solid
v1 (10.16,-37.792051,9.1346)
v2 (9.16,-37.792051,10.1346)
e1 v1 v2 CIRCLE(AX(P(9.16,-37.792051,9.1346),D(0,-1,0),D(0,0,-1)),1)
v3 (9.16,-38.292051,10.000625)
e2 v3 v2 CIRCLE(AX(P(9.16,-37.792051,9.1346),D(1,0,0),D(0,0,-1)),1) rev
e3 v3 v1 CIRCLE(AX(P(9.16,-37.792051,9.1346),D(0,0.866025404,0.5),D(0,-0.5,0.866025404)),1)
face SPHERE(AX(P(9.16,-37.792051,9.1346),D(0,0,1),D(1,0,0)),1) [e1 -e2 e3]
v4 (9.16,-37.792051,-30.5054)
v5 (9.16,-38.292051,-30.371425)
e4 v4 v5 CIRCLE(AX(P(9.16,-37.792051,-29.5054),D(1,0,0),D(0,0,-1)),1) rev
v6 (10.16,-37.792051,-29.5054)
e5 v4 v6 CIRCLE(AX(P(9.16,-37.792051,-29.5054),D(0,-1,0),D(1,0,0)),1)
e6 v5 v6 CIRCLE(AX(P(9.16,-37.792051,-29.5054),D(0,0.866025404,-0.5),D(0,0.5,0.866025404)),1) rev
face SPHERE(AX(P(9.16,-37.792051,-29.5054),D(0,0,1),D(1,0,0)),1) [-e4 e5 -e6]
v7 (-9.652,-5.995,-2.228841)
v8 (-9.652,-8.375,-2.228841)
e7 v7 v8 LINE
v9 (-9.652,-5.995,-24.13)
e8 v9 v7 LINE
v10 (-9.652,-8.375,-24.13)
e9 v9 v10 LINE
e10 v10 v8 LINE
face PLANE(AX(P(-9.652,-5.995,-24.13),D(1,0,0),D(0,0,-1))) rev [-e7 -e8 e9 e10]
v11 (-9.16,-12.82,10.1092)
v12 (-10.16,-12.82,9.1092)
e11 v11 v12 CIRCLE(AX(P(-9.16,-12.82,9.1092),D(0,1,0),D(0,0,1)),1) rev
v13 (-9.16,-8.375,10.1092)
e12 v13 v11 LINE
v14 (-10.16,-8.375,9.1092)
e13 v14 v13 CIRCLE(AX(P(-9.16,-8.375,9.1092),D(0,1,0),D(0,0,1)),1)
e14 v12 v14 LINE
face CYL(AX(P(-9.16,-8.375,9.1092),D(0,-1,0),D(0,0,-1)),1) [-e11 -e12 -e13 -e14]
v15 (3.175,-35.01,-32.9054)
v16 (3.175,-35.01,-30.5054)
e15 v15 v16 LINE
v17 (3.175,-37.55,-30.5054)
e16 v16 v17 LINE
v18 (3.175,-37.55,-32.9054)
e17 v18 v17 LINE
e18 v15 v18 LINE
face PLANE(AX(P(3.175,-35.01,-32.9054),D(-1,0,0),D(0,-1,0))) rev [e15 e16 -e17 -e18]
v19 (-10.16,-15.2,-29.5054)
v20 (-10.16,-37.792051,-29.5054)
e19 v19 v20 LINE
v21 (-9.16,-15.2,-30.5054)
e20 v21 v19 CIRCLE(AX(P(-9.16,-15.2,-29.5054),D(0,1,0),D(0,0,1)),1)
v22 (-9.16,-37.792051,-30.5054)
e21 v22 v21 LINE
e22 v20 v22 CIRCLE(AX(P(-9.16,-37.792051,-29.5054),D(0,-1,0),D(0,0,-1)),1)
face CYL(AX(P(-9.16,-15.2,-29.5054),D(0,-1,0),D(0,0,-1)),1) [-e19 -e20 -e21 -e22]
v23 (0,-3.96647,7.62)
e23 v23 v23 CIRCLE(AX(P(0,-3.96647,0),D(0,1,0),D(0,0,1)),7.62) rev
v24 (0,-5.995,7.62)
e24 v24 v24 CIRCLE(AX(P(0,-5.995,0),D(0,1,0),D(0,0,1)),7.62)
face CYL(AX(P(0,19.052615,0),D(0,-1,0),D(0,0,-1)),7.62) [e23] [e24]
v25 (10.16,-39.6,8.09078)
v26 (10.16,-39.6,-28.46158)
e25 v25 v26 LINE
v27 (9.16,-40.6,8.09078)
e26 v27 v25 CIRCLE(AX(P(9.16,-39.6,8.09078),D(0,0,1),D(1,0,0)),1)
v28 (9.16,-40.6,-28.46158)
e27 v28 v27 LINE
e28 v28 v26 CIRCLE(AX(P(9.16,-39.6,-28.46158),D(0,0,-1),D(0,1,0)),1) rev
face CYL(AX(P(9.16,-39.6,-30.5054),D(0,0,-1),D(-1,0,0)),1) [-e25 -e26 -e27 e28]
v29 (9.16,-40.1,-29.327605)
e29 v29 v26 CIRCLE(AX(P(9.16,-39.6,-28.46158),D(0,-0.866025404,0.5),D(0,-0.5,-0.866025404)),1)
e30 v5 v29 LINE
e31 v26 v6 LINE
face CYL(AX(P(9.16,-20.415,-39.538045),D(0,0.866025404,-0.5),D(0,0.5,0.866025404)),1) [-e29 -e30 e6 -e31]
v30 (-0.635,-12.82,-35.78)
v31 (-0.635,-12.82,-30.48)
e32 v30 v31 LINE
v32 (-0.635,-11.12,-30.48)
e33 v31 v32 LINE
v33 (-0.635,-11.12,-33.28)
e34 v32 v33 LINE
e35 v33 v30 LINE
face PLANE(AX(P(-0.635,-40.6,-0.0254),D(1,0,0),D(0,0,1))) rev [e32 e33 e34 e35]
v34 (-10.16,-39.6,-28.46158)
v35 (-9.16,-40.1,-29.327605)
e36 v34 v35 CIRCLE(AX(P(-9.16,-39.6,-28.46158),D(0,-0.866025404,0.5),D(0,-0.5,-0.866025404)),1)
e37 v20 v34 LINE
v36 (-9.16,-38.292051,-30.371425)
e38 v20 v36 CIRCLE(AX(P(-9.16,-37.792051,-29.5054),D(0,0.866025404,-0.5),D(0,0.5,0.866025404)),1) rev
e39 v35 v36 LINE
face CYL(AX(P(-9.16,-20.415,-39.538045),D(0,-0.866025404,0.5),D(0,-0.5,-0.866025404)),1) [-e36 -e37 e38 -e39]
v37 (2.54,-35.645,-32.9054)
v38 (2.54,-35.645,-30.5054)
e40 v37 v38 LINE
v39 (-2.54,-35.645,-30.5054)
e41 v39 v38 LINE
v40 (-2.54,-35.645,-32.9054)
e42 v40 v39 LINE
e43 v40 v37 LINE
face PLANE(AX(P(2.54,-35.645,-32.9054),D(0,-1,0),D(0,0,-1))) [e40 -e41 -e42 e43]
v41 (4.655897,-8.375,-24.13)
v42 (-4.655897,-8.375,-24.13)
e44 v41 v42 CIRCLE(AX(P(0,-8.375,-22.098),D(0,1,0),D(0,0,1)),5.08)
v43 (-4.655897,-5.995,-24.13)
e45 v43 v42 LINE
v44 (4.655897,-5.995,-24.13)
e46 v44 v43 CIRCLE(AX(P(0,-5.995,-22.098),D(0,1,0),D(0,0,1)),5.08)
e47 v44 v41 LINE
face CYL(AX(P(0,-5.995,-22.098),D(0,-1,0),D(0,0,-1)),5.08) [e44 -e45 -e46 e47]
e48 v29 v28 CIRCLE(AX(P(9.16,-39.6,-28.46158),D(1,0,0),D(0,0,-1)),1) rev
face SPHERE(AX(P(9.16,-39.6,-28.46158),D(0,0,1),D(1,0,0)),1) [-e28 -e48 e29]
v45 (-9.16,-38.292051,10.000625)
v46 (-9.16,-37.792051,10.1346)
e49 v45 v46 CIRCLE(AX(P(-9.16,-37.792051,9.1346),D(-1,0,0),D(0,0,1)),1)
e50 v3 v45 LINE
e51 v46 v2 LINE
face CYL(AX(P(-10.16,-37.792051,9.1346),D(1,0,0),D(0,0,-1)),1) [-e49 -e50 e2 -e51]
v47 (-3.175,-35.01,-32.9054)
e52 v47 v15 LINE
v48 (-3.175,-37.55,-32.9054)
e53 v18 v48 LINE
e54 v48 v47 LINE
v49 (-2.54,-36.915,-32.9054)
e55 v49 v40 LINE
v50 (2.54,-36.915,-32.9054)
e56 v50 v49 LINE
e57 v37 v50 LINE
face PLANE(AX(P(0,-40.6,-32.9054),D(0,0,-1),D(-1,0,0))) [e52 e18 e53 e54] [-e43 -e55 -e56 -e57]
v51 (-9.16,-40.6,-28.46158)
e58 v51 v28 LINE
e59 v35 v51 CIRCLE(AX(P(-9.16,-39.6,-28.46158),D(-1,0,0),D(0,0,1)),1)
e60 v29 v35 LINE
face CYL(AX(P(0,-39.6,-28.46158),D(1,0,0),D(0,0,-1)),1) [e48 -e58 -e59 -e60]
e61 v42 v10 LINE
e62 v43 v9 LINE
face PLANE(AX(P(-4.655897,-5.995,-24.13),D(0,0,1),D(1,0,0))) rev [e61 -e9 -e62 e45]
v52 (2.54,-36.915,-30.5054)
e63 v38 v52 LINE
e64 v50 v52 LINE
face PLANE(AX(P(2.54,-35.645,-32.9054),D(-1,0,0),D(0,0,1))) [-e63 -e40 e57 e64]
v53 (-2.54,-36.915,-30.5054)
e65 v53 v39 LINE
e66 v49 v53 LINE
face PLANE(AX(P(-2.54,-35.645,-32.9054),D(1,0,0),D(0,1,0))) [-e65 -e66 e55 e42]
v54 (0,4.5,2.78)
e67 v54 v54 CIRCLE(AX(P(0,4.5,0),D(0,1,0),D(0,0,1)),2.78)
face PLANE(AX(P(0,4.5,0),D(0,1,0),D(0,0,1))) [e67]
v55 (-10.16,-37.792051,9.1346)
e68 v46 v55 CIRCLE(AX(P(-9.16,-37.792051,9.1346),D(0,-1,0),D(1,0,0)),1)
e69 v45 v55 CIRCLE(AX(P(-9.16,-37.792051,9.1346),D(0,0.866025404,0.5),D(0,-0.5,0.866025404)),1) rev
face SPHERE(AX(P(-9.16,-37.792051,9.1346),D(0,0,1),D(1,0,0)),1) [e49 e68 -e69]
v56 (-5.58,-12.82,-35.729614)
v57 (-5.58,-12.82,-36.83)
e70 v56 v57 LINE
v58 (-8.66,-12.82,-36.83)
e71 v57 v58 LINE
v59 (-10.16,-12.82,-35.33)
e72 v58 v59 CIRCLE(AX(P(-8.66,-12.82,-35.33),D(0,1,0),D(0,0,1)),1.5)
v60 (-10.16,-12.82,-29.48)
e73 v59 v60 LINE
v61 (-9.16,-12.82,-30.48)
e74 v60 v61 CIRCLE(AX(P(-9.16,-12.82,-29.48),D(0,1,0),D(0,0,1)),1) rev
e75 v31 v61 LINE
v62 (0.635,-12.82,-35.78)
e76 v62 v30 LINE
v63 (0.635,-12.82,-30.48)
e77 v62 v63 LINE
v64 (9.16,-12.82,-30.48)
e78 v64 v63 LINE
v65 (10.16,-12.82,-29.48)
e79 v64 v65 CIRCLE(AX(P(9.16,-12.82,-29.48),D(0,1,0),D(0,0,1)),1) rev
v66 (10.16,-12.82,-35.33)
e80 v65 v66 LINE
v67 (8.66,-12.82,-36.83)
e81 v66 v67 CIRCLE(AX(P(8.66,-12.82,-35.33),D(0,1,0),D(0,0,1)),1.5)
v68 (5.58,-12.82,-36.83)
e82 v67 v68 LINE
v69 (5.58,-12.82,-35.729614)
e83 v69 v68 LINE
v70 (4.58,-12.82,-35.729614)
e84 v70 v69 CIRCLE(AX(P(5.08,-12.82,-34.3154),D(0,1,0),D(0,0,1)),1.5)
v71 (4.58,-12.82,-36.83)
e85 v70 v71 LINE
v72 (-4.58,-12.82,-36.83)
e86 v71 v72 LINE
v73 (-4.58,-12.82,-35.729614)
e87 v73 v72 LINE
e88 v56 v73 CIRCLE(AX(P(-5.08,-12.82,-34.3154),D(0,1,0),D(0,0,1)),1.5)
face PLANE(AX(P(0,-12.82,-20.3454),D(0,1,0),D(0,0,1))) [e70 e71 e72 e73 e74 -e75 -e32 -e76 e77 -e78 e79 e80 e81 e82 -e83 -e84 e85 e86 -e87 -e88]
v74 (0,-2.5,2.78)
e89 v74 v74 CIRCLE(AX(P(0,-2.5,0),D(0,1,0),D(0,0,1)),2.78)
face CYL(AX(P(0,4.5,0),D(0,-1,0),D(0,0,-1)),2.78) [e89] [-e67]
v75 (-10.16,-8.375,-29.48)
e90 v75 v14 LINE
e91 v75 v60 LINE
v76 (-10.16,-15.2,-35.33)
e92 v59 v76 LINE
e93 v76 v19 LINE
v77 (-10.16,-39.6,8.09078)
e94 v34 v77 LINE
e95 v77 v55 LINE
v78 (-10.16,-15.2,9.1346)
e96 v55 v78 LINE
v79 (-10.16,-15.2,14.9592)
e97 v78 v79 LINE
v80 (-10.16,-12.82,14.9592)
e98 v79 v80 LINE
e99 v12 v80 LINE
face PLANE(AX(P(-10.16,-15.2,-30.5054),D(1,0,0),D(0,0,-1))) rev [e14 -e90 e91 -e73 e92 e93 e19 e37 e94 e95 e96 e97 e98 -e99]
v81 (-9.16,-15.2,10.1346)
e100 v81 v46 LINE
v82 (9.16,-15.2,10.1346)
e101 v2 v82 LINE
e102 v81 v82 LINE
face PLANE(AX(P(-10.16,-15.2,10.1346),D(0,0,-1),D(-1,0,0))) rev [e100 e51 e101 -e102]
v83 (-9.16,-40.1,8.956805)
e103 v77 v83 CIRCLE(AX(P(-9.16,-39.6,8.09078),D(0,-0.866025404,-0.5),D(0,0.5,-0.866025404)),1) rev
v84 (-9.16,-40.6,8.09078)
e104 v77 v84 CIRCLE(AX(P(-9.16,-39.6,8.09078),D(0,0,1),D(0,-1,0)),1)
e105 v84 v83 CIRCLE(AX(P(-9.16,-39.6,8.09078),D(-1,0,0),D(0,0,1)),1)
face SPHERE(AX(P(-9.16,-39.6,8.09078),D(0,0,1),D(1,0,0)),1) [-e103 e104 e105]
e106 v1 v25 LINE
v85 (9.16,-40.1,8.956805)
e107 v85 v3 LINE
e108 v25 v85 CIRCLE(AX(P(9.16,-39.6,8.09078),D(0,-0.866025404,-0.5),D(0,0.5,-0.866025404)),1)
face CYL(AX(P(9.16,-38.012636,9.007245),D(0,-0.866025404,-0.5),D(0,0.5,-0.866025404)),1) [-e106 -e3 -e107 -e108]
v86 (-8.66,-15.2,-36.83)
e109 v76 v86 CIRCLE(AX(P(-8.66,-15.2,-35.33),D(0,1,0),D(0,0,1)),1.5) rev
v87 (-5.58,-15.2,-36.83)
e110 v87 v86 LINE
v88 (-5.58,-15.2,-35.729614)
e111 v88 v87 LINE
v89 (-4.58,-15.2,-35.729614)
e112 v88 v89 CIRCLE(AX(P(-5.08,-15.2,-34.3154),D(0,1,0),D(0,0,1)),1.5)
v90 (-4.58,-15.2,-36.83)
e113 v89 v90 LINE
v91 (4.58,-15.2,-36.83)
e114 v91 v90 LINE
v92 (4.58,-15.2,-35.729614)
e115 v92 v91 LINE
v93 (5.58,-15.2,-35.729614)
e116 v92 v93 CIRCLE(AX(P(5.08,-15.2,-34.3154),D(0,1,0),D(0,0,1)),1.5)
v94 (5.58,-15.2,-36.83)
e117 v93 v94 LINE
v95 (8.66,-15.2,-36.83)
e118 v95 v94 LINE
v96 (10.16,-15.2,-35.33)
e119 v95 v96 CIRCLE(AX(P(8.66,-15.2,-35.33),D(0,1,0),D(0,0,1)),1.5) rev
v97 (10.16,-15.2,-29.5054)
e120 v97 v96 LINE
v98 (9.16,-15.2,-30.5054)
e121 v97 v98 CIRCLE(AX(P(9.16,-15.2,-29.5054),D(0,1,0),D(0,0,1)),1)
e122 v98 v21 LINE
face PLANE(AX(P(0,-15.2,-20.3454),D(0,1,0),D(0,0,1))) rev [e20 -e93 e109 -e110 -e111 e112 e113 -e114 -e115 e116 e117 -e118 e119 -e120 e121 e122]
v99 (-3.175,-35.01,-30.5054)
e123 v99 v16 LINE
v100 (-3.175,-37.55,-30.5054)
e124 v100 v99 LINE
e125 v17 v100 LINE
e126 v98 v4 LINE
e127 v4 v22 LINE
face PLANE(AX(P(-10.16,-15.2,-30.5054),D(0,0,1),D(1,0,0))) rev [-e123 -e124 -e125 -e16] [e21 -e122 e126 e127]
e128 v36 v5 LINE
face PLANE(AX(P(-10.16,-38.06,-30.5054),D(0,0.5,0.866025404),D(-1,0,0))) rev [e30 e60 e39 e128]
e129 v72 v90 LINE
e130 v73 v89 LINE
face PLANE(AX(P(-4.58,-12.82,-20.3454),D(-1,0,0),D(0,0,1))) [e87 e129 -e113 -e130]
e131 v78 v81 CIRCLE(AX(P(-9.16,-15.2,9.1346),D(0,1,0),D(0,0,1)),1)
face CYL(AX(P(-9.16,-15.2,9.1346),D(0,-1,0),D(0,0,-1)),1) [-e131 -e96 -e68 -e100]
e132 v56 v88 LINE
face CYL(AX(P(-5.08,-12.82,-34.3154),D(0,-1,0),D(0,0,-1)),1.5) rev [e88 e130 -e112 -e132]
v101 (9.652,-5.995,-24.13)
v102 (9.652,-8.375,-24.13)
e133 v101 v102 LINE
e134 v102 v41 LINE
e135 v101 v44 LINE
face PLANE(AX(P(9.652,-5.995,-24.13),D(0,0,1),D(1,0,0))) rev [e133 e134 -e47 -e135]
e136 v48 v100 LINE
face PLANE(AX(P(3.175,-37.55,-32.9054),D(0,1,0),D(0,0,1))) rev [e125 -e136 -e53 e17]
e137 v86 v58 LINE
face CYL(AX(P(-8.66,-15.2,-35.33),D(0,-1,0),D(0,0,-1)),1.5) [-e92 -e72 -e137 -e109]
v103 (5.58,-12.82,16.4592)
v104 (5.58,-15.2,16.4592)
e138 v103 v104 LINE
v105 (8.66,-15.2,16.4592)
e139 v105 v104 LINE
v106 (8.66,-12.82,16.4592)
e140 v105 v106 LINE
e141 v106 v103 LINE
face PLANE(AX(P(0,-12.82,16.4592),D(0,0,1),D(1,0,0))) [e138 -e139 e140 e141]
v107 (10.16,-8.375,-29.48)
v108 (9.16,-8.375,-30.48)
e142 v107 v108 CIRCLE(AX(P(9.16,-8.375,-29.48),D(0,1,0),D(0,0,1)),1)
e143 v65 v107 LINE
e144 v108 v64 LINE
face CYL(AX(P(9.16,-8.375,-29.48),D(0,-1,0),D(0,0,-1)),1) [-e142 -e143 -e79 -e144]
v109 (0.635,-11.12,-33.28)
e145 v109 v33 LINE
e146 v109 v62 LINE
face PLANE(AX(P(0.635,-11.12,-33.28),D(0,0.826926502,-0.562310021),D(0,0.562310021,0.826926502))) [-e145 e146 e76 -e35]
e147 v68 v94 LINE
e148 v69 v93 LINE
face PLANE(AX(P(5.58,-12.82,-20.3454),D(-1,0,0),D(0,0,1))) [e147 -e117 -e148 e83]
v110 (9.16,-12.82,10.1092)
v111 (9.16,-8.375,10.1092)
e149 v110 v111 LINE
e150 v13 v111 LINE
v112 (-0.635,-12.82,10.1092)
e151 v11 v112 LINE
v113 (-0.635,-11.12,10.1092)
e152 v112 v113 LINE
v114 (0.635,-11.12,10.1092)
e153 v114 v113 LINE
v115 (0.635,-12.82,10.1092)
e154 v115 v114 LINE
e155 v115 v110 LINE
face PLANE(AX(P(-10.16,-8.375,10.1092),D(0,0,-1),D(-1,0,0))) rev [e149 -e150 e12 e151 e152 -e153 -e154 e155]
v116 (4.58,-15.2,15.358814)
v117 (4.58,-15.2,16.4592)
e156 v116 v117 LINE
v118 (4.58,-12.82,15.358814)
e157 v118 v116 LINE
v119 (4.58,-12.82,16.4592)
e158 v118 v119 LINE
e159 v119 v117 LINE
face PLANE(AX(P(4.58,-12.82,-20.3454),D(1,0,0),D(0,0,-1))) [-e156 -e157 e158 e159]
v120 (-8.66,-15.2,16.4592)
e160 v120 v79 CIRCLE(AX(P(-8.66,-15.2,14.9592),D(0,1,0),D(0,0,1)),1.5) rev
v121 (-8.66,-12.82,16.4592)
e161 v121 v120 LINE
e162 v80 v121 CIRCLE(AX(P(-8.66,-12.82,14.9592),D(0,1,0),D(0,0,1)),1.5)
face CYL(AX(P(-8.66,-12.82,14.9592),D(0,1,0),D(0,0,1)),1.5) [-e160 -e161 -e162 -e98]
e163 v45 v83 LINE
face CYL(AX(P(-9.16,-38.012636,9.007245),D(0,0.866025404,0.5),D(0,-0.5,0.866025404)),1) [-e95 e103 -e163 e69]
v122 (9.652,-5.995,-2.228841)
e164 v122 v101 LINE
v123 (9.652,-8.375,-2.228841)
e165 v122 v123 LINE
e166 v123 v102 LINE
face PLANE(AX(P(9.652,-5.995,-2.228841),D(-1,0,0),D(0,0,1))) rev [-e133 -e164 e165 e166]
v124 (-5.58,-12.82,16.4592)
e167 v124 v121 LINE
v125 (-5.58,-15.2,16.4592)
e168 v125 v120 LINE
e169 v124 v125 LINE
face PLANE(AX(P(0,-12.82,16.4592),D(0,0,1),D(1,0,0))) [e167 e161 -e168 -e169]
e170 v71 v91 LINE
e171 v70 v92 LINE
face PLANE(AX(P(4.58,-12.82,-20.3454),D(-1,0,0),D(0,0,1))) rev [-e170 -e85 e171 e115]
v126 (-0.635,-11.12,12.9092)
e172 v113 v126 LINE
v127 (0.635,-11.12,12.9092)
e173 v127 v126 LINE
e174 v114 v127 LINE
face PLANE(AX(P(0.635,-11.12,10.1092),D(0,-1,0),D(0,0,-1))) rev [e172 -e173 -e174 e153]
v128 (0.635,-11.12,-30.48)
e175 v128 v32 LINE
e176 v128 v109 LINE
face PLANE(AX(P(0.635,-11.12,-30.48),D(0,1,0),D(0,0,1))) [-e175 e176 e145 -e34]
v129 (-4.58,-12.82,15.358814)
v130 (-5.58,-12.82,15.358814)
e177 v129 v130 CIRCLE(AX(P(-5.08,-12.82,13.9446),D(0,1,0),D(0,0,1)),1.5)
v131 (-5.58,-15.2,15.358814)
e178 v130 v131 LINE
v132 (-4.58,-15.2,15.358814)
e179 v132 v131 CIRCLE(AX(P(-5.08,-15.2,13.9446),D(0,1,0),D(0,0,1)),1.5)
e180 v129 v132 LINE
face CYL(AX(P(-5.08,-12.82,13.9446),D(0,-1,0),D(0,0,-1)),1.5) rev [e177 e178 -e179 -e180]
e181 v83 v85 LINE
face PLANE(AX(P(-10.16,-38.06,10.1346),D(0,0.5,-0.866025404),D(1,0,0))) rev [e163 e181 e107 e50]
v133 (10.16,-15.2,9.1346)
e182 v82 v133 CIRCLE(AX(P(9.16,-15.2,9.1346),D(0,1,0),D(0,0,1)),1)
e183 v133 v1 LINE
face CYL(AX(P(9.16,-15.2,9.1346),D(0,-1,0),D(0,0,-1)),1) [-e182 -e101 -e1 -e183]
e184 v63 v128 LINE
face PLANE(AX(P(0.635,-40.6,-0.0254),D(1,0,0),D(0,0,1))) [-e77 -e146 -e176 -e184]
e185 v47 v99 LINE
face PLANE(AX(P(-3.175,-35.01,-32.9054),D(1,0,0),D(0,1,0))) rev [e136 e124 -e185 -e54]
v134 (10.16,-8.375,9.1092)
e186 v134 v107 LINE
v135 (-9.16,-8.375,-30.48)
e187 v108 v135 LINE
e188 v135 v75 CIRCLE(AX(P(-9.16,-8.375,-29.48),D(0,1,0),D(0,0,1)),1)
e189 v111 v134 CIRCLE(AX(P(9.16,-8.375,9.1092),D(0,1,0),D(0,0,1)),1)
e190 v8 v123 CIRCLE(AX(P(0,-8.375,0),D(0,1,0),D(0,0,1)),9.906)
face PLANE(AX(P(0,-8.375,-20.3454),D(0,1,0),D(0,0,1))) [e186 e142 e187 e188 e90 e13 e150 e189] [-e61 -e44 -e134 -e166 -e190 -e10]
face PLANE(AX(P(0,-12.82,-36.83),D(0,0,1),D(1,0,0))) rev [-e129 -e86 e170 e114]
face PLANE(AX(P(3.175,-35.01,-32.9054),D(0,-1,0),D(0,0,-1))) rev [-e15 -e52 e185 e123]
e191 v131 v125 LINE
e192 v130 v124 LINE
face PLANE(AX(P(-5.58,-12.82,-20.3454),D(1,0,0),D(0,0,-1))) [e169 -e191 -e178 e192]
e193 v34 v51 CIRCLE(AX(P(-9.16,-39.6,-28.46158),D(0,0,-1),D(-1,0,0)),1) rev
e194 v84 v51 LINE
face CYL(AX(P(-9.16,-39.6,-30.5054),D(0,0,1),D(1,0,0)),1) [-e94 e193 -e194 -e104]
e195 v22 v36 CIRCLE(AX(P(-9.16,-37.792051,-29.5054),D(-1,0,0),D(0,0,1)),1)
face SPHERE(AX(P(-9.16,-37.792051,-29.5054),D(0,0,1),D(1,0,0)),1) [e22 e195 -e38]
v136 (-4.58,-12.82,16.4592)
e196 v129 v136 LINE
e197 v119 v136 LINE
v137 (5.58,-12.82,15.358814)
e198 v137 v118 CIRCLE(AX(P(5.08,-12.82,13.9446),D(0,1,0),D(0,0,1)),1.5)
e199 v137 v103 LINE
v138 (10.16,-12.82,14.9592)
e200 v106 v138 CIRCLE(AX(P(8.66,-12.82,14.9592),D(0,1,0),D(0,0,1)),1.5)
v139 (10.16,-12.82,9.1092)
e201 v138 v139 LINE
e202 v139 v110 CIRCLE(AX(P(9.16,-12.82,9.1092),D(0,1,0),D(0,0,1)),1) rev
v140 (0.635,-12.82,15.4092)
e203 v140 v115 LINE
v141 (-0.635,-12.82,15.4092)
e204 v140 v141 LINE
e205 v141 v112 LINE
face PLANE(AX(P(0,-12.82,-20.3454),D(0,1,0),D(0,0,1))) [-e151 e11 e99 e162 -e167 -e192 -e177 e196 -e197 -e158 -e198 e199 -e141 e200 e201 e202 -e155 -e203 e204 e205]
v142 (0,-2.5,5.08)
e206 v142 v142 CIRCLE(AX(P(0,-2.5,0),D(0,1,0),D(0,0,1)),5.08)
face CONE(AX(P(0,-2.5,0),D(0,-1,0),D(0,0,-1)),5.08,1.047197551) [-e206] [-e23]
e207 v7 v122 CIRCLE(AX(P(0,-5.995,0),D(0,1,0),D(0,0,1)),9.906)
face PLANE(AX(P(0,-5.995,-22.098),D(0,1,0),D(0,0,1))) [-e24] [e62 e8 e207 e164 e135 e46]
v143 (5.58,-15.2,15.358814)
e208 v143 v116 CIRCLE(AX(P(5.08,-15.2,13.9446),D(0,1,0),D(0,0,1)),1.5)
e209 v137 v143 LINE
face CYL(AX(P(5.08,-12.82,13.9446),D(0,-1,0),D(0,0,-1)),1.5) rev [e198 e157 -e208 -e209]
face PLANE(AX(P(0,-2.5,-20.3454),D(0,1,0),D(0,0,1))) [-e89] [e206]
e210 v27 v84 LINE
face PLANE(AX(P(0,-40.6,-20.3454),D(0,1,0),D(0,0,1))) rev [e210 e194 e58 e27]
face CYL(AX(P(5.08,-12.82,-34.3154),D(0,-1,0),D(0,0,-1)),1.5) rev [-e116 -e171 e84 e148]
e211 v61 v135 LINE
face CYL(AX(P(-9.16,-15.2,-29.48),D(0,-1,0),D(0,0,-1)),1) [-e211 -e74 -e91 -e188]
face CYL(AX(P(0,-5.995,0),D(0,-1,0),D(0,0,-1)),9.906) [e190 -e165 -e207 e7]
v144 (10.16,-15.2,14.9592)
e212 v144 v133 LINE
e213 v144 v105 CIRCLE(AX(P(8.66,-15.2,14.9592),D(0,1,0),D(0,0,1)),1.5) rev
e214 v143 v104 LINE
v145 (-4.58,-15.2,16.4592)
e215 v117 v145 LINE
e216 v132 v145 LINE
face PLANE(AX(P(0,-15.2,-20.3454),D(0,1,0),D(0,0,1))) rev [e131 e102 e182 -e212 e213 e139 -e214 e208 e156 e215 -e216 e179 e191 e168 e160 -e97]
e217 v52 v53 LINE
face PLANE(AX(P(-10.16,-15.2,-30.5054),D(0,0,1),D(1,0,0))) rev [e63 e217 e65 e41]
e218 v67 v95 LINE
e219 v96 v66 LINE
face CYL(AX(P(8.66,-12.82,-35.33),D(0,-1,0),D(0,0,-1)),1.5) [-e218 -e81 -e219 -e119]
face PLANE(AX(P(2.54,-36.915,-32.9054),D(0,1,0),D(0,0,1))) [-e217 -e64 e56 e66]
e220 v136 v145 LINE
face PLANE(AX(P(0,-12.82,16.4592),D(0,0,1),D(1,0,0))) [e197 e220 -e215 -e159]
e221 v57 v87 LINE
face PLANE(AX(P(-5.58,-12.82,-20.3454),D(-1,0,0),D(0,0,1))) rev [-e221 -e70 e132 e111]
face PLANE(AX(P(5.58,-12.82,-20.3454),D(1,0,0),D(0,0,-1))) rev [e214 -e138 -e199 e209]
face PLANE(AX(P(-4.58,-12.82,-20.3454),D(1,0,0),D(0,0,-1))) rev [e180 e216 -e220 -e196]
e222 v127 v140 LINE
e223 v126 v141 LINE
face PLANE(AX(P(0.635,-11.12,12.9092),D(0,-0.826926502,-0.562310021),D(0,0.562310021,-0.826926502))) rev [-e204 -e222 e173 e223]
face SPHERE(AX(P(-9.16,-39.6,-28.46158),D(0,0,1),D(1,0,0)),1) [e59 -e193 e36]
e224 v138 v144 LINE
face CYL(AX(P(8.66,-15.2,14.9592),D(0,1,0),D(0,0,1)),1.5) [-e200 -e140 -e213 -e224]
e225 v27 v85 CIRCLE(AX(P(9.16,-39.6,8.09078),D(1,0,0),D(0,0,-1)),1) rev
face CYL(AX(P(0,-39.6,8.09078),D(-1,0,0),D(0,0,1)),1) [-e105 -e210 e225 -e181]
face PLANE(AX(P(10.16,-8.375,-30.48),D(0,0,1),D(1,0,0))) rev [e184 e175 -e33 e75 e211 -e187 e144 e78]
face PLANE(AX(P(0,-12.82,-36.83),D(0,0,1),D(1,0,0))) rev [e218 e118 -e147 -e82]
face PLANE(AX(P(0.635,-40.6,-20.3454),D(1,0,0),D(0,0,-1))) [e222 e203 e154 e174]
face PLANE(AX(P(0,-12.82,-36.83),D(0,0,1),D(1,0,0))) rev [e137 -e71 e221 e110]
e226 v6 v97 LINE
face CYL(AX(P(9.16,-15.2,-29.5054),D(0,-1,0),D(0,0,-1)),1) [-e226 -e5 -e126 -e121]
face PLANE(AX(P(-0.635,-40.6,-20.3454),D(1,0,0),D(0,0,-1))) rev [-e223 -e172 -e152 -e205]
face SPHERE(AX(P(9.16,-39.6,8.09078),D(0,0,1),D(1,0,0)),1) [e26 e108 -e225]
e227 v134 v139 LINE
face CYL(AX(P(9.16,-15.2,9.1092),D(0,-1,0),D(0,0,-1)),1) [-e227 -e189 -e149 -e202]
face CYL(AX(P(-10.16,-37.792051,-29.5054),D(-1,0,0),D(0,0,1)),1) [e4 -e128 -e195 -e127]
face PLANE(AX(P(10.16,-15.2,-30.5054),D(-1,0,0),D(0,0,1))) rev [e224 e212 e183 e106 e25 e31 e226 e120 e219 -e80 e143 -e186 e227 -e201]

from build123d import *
from OCP.BRepFilletAPI import BRepFilletAPI_MakeChamfer

# Parameters (mm, degrees)
SKETCH1_W           = 20.32
SKETCH1_H           = 40.64
BOSS_EXTRUDE1_DEPTH = 25.4
SKETCH2_W           = 20.32
SKETCH2_H           = 40.64
BOSS_EXTRUDE2_DEPTH = 2.38
SKETCH3_W           = 20.32
SKETCH3_H           = 40.5892
BOSS_EXTRUDE3_DEPTH = 4.445
BOSS_EXTRUDE4_DEPTH = 2.38
SKETCH6_R           = 7.62
BOSS_EXTRUDE5_DEPTH = 3.495
CHAMFER1_SIZE       = 2.54
CHAMFER1_SIZE2      = 1.466469684
BOSS_EXTRUDE6_DEPTH = 0.635
SKETCH9_R           = 2.78
BOSS_EXTRUDE7_DEPTH = 7
CHAMFER2_SIZE       = 2.54
CHAMFER2_SIZE2      = 1.466469684
FILLET1_R           = 1
FILLET2_R           = 1.5
SKETCH10_W          = 6.35
SKETCH10_H          = 2.54
SKETCH10_W_2        = 5.08
SKETCH10_H_2        = 1.27
BOSS_EXTRUDE8_DEPTH = 2.4


with BuildPart() as part:
    # Sketch1 → Boss-Extrude1 (new body)
    with BuildSketch(Plane(origin=(0, 0, 0), x_dir=(1, 0, 0), z_dir=(0, 1, 0))):
        with Locations((0, -10.16)):
            Rectangle(SKETCH1_W, SKETCH1_H)
    extrude(amount=BOSS_EXTRUDE1_DEPTH)

    # Sketch2 → Boss-Extrude2 (add)
    with BuildSketch(Plane(origin=(0, 25.4, 0), x_dir=(1, 0, 0), z_dir=(0, 1, 0))):
        with BuildLine():
            ThreePointArc((-5.58, 15.384213562), (-5.08, 12.47), (-4.58, 15.384213562))
            Line((-4.58, 15.384213562), (-4.58, 16.4846))
            Line((-4.58, 16.4846), (4.58, 16.4846))
            Line((4.58, 16.4846), (4.58, 15.384213562))
            ThreePointArc((4.58, 15.384213562), (5.08, 12.47), (5.58, 15.384213562))
            Line((5.58, 15.384213562), (5.58, 16.4846))
            Line((5.58, 16.4846), (10.16, 16.4846))
            Line((10.16, 16.4846), (10.16, 10.16))
            Line((10.16, 10.16), (-10.16, 10.16))
            Line((-10.16, 10.16), (-10.16, 16.4846))
            Line((-10.16, 16.4846), (-5.58, 16.4846))
            Line((-5.58, 16.4846), (-5.58, 15.384213562))
        make_face()
        with Locations((0, -10.16)):
            Rectangle(SKETCH2_W, SKETCH2_H)
        with BuildLine():
            ThreePointArc((5.58, -35.704213562), (5.08, -32.79), (4.58, -35.704213562))
            Line((4.58, -35.704213562), (4.58, -36.8046))
            Line((4.58, -36.8046), (-4.58, -36.8046))
            Line((-4.58, -36.8046), (-4.58, -35.704213562))
            ThreePointArc((-4.58, -35.704213562), (-5.08, -32.79), (-5.58, -35.704213562))
            Line((-5.58, -35.704213562), (-5.58, -36.8046))
            Line((-5.58, -36.8046), (-10.16, -36.8046))
            Line((-10.16, -36.8046), (-10.16, -30.48))
            Line((-10.16, -30.48), (10.16, -30.48))
            Line((10.16, -30.48), (10.16, -36.8046))
            Line((10.16, -36.8046), (5.58, -36.8046))
            Line((5.58, -36.8046), (5.58, -35.704213562))
        make_face()
    extrude(amount=BOSS_EXTRUDE2_DEPTH)

    # Sketch3 → Boss-Extrude3 (add)
    with BuildSketch(Plane(origin=(0, 27.78, 0), x_dir=(1, 0, 0), z_dir=(0, 1, 0))):
        with Locations((0, -10.16)):
            Rectangle(SKETCH3_W, SKETCH3_H)
    extrude(amount=BOSS_EXTRUDE3_DEPTH)

    # Sketch4 → Boss-Extrude4 (add)
    with BuildSketch(Plane(origin=(0, 32.225, 0), x_dir=(1, 0, 0), z_dir=(0, 1, 0))):
        with BuildLine():
            Line((9.652, -18.116559046), (9.652, 3.7846))
            Line((9.652, 3.7846), (4.655896906, 3.7846))
            ThreePointArc((4.655896906, 3.7846), (0, 6.8326), (-4.655896906, 3.7846))
            Line((-4.655896906, 3.7846), (-9.652, 3.7846))
            Line((-9.652, 3.7846), (-9.652, -18.116559046))
            ThreePointArc((-9.652, -18.116559046), (0, -30.2514), (9.652, -18.116559046))
        make_face()
    extrude(amount=BOSS_EXTRUDE4_DEPTH)

    # Sketch6 → Boss-Extrude5 (add)
    with BuildSketch(Plane(origin=(0, 34.605, 0), x_dir=(1, 0, 0), z_dir=(0, 1, 0))):
        with Locations(Location((0, -20.3454, 0), (0, 0, 270))):
            Circle(SKETCH6_R)
    extrude(amount=BOSS_EXTRUDE5_DEPTH)

    # Chamfer1
    chamfer1_edges = [part.edges().sort_by_distance(p)[0] for p in [
        (0, 38.1, 12.7254),
    ]]
    chamfer1_side = [part.faces().sort_by_distance(p)[0] for p in [
        (0, 38.1, 20.3454),
    ]]
    chamfer(chamfer1_edges, length=CHAMFER1_SIZE, length2=CHAMFER1_SIZE2, reference=chamfer1_side[0])

    # Sketch8 → Boss-Extrude6 (add, symmetric)
    with BuildSketch(Plane(origin=(0, 0, 0), x_dir=(0, 0, -1), z_dir=(1, 0, 0))):
        Polygon((-30.4546, 27.78), (-30.4546, 29.48), (-33.2546, 29.48), (-35.7546, 27.78), align=None)
    boss_extrude6 = extrude(amount=BOSS_EXTRUDE6_DEPTH, both=True)

    # Mirror1: Boss-Extrude6 across plane
    add(boss_extrude6.mirror(Plane.XY.offset(10.16)))

    # Sketch9 → Boss-Extrude7 (add)
    with BuildSketch(Plane(origin=(0, 38.1, 0), x_dir=(1, 0, 0), z_dir=(0, 1, 0))):
        with Locations(Location((0, -20.3454, 0), (0, 0, 270))):
            Circle(SKETCH9_R)
    extrude(amount=BOSS_EXTRUDE7_DEPTH)

    # Chamfer2: one chamfer whose edges measure the first distance from different faces: ONE call of the kernel's chamfer builder (chamfer() names one face for all edges)
    chamfer2_edges_1 = [part.edges().sort_by_distance(p)[0] for p in [
        (0, 0, -10.16),
    ]]
    chamfer2_side_1 = [part.faces().sort_by_distance(p)[0] for p in [
        (0, 12.7, -10.16),
    ]]
    chamfer2_edges_2 = [part.edges().sort_by_distance(p)[0] for p in [
        (0, 0, 30.48),
    ]]
    chamfer2_side_2 = [part.faces().sort_by_distance(p)[0] for p in [
        (0, 12.7, 30.48),
    ]]
    chamfer2 = BRepFilletAPI_MakeChamfer(part.part.solid().wrapped)
    for e in chamfer2_edges_1:
        chamfer2.Add(CHAMFER2_SIZE, CHAMFER2_SIZE2, e.wrapped, chamfer2_side_1[0].wrapped)  # the first distance lies on this face
    for e in chamfer2_edges_2:
        chamfer2.Add(CHAMFER2_SIZE, CHAMFER2_SIZE2, e.wrapped, chamfer2_side_2[0].wrapped)  # the first distance lies on this face
    add(Compound.cast(chamfer2.Shape()), mode=Mode.REPLACE)

    # Fillet1
    fillet1_edges = [part.edges().sort_by_distance(p)[0] for p in [
        (-10.16, 30.0025, -10.1346),
        (-10.16, 13.97, -10.16),
        (-10.16, 1.27, -9.426765158),
        (-10.16, 0, 10.16),
        (0, 0, -8.693530316),
        (0, 2.54, -10.16),
        (10.16, 1.27, -9.426765158),
        (10.16, 0, 10.16),
        (0, 0, 29.013530316),
        (10.16, 1.27, 29.746765158),
        (0, 2.54, 30.48),
        (10.16, 13.97, -10.16),
        (10.16, 30.0025, -10.1346),
        (-10.16, 30.0025, 30.4546),
        (10.16, 30.0025, 30.4546),
        (-10.16, 13.97, 30.48),
        (10.16, 13.97, 30.48),
        (-10.16, 1.27, 29.746765158),
    ]]
    fillet(fillet1_edges, radius=FILLET1_R)

    # Fillet2
    fillet2_edges = [part.edges().sort_by_distance(p)[0] for p in [
        (-10.16, 26.59, -16.4846),
        (10.16, 26.59, -16.4846),
        (10.16, 26.59, 36.8046),
        (-10.16, 26.59, 36.8046),
    ]]
    fillet(fillet2_edges, radius=FILLET2_R)

    # Sketch10 → Boss-Extrude8 (add)
    with BuildSketch(Plane(origin=(0, 0, -10.16), x_dir=(-1, 0, 0), z_dir=(0, 0, -1))):
        with Locations((0, 4.32)):
            Rectangle(SKETCH10_W, SKETCH10_H)
        with Locations((0, 4.32)):
            Rectangle(SKETCH10_W_2, SKETCH10_H_2, mode=Mode.SUBTRACT)
    extrude(amount=BOSS_EXTRUDE8_DEPTH)


with BuildPart() as part_1:
    # Body-Move/Copy1: read off the stored shape, not the designer's step
    # Body-Move/Copy1: moved
    add(part.part.moved(Location((0, -40.6, -20.3454))))


solid = part_1.part
